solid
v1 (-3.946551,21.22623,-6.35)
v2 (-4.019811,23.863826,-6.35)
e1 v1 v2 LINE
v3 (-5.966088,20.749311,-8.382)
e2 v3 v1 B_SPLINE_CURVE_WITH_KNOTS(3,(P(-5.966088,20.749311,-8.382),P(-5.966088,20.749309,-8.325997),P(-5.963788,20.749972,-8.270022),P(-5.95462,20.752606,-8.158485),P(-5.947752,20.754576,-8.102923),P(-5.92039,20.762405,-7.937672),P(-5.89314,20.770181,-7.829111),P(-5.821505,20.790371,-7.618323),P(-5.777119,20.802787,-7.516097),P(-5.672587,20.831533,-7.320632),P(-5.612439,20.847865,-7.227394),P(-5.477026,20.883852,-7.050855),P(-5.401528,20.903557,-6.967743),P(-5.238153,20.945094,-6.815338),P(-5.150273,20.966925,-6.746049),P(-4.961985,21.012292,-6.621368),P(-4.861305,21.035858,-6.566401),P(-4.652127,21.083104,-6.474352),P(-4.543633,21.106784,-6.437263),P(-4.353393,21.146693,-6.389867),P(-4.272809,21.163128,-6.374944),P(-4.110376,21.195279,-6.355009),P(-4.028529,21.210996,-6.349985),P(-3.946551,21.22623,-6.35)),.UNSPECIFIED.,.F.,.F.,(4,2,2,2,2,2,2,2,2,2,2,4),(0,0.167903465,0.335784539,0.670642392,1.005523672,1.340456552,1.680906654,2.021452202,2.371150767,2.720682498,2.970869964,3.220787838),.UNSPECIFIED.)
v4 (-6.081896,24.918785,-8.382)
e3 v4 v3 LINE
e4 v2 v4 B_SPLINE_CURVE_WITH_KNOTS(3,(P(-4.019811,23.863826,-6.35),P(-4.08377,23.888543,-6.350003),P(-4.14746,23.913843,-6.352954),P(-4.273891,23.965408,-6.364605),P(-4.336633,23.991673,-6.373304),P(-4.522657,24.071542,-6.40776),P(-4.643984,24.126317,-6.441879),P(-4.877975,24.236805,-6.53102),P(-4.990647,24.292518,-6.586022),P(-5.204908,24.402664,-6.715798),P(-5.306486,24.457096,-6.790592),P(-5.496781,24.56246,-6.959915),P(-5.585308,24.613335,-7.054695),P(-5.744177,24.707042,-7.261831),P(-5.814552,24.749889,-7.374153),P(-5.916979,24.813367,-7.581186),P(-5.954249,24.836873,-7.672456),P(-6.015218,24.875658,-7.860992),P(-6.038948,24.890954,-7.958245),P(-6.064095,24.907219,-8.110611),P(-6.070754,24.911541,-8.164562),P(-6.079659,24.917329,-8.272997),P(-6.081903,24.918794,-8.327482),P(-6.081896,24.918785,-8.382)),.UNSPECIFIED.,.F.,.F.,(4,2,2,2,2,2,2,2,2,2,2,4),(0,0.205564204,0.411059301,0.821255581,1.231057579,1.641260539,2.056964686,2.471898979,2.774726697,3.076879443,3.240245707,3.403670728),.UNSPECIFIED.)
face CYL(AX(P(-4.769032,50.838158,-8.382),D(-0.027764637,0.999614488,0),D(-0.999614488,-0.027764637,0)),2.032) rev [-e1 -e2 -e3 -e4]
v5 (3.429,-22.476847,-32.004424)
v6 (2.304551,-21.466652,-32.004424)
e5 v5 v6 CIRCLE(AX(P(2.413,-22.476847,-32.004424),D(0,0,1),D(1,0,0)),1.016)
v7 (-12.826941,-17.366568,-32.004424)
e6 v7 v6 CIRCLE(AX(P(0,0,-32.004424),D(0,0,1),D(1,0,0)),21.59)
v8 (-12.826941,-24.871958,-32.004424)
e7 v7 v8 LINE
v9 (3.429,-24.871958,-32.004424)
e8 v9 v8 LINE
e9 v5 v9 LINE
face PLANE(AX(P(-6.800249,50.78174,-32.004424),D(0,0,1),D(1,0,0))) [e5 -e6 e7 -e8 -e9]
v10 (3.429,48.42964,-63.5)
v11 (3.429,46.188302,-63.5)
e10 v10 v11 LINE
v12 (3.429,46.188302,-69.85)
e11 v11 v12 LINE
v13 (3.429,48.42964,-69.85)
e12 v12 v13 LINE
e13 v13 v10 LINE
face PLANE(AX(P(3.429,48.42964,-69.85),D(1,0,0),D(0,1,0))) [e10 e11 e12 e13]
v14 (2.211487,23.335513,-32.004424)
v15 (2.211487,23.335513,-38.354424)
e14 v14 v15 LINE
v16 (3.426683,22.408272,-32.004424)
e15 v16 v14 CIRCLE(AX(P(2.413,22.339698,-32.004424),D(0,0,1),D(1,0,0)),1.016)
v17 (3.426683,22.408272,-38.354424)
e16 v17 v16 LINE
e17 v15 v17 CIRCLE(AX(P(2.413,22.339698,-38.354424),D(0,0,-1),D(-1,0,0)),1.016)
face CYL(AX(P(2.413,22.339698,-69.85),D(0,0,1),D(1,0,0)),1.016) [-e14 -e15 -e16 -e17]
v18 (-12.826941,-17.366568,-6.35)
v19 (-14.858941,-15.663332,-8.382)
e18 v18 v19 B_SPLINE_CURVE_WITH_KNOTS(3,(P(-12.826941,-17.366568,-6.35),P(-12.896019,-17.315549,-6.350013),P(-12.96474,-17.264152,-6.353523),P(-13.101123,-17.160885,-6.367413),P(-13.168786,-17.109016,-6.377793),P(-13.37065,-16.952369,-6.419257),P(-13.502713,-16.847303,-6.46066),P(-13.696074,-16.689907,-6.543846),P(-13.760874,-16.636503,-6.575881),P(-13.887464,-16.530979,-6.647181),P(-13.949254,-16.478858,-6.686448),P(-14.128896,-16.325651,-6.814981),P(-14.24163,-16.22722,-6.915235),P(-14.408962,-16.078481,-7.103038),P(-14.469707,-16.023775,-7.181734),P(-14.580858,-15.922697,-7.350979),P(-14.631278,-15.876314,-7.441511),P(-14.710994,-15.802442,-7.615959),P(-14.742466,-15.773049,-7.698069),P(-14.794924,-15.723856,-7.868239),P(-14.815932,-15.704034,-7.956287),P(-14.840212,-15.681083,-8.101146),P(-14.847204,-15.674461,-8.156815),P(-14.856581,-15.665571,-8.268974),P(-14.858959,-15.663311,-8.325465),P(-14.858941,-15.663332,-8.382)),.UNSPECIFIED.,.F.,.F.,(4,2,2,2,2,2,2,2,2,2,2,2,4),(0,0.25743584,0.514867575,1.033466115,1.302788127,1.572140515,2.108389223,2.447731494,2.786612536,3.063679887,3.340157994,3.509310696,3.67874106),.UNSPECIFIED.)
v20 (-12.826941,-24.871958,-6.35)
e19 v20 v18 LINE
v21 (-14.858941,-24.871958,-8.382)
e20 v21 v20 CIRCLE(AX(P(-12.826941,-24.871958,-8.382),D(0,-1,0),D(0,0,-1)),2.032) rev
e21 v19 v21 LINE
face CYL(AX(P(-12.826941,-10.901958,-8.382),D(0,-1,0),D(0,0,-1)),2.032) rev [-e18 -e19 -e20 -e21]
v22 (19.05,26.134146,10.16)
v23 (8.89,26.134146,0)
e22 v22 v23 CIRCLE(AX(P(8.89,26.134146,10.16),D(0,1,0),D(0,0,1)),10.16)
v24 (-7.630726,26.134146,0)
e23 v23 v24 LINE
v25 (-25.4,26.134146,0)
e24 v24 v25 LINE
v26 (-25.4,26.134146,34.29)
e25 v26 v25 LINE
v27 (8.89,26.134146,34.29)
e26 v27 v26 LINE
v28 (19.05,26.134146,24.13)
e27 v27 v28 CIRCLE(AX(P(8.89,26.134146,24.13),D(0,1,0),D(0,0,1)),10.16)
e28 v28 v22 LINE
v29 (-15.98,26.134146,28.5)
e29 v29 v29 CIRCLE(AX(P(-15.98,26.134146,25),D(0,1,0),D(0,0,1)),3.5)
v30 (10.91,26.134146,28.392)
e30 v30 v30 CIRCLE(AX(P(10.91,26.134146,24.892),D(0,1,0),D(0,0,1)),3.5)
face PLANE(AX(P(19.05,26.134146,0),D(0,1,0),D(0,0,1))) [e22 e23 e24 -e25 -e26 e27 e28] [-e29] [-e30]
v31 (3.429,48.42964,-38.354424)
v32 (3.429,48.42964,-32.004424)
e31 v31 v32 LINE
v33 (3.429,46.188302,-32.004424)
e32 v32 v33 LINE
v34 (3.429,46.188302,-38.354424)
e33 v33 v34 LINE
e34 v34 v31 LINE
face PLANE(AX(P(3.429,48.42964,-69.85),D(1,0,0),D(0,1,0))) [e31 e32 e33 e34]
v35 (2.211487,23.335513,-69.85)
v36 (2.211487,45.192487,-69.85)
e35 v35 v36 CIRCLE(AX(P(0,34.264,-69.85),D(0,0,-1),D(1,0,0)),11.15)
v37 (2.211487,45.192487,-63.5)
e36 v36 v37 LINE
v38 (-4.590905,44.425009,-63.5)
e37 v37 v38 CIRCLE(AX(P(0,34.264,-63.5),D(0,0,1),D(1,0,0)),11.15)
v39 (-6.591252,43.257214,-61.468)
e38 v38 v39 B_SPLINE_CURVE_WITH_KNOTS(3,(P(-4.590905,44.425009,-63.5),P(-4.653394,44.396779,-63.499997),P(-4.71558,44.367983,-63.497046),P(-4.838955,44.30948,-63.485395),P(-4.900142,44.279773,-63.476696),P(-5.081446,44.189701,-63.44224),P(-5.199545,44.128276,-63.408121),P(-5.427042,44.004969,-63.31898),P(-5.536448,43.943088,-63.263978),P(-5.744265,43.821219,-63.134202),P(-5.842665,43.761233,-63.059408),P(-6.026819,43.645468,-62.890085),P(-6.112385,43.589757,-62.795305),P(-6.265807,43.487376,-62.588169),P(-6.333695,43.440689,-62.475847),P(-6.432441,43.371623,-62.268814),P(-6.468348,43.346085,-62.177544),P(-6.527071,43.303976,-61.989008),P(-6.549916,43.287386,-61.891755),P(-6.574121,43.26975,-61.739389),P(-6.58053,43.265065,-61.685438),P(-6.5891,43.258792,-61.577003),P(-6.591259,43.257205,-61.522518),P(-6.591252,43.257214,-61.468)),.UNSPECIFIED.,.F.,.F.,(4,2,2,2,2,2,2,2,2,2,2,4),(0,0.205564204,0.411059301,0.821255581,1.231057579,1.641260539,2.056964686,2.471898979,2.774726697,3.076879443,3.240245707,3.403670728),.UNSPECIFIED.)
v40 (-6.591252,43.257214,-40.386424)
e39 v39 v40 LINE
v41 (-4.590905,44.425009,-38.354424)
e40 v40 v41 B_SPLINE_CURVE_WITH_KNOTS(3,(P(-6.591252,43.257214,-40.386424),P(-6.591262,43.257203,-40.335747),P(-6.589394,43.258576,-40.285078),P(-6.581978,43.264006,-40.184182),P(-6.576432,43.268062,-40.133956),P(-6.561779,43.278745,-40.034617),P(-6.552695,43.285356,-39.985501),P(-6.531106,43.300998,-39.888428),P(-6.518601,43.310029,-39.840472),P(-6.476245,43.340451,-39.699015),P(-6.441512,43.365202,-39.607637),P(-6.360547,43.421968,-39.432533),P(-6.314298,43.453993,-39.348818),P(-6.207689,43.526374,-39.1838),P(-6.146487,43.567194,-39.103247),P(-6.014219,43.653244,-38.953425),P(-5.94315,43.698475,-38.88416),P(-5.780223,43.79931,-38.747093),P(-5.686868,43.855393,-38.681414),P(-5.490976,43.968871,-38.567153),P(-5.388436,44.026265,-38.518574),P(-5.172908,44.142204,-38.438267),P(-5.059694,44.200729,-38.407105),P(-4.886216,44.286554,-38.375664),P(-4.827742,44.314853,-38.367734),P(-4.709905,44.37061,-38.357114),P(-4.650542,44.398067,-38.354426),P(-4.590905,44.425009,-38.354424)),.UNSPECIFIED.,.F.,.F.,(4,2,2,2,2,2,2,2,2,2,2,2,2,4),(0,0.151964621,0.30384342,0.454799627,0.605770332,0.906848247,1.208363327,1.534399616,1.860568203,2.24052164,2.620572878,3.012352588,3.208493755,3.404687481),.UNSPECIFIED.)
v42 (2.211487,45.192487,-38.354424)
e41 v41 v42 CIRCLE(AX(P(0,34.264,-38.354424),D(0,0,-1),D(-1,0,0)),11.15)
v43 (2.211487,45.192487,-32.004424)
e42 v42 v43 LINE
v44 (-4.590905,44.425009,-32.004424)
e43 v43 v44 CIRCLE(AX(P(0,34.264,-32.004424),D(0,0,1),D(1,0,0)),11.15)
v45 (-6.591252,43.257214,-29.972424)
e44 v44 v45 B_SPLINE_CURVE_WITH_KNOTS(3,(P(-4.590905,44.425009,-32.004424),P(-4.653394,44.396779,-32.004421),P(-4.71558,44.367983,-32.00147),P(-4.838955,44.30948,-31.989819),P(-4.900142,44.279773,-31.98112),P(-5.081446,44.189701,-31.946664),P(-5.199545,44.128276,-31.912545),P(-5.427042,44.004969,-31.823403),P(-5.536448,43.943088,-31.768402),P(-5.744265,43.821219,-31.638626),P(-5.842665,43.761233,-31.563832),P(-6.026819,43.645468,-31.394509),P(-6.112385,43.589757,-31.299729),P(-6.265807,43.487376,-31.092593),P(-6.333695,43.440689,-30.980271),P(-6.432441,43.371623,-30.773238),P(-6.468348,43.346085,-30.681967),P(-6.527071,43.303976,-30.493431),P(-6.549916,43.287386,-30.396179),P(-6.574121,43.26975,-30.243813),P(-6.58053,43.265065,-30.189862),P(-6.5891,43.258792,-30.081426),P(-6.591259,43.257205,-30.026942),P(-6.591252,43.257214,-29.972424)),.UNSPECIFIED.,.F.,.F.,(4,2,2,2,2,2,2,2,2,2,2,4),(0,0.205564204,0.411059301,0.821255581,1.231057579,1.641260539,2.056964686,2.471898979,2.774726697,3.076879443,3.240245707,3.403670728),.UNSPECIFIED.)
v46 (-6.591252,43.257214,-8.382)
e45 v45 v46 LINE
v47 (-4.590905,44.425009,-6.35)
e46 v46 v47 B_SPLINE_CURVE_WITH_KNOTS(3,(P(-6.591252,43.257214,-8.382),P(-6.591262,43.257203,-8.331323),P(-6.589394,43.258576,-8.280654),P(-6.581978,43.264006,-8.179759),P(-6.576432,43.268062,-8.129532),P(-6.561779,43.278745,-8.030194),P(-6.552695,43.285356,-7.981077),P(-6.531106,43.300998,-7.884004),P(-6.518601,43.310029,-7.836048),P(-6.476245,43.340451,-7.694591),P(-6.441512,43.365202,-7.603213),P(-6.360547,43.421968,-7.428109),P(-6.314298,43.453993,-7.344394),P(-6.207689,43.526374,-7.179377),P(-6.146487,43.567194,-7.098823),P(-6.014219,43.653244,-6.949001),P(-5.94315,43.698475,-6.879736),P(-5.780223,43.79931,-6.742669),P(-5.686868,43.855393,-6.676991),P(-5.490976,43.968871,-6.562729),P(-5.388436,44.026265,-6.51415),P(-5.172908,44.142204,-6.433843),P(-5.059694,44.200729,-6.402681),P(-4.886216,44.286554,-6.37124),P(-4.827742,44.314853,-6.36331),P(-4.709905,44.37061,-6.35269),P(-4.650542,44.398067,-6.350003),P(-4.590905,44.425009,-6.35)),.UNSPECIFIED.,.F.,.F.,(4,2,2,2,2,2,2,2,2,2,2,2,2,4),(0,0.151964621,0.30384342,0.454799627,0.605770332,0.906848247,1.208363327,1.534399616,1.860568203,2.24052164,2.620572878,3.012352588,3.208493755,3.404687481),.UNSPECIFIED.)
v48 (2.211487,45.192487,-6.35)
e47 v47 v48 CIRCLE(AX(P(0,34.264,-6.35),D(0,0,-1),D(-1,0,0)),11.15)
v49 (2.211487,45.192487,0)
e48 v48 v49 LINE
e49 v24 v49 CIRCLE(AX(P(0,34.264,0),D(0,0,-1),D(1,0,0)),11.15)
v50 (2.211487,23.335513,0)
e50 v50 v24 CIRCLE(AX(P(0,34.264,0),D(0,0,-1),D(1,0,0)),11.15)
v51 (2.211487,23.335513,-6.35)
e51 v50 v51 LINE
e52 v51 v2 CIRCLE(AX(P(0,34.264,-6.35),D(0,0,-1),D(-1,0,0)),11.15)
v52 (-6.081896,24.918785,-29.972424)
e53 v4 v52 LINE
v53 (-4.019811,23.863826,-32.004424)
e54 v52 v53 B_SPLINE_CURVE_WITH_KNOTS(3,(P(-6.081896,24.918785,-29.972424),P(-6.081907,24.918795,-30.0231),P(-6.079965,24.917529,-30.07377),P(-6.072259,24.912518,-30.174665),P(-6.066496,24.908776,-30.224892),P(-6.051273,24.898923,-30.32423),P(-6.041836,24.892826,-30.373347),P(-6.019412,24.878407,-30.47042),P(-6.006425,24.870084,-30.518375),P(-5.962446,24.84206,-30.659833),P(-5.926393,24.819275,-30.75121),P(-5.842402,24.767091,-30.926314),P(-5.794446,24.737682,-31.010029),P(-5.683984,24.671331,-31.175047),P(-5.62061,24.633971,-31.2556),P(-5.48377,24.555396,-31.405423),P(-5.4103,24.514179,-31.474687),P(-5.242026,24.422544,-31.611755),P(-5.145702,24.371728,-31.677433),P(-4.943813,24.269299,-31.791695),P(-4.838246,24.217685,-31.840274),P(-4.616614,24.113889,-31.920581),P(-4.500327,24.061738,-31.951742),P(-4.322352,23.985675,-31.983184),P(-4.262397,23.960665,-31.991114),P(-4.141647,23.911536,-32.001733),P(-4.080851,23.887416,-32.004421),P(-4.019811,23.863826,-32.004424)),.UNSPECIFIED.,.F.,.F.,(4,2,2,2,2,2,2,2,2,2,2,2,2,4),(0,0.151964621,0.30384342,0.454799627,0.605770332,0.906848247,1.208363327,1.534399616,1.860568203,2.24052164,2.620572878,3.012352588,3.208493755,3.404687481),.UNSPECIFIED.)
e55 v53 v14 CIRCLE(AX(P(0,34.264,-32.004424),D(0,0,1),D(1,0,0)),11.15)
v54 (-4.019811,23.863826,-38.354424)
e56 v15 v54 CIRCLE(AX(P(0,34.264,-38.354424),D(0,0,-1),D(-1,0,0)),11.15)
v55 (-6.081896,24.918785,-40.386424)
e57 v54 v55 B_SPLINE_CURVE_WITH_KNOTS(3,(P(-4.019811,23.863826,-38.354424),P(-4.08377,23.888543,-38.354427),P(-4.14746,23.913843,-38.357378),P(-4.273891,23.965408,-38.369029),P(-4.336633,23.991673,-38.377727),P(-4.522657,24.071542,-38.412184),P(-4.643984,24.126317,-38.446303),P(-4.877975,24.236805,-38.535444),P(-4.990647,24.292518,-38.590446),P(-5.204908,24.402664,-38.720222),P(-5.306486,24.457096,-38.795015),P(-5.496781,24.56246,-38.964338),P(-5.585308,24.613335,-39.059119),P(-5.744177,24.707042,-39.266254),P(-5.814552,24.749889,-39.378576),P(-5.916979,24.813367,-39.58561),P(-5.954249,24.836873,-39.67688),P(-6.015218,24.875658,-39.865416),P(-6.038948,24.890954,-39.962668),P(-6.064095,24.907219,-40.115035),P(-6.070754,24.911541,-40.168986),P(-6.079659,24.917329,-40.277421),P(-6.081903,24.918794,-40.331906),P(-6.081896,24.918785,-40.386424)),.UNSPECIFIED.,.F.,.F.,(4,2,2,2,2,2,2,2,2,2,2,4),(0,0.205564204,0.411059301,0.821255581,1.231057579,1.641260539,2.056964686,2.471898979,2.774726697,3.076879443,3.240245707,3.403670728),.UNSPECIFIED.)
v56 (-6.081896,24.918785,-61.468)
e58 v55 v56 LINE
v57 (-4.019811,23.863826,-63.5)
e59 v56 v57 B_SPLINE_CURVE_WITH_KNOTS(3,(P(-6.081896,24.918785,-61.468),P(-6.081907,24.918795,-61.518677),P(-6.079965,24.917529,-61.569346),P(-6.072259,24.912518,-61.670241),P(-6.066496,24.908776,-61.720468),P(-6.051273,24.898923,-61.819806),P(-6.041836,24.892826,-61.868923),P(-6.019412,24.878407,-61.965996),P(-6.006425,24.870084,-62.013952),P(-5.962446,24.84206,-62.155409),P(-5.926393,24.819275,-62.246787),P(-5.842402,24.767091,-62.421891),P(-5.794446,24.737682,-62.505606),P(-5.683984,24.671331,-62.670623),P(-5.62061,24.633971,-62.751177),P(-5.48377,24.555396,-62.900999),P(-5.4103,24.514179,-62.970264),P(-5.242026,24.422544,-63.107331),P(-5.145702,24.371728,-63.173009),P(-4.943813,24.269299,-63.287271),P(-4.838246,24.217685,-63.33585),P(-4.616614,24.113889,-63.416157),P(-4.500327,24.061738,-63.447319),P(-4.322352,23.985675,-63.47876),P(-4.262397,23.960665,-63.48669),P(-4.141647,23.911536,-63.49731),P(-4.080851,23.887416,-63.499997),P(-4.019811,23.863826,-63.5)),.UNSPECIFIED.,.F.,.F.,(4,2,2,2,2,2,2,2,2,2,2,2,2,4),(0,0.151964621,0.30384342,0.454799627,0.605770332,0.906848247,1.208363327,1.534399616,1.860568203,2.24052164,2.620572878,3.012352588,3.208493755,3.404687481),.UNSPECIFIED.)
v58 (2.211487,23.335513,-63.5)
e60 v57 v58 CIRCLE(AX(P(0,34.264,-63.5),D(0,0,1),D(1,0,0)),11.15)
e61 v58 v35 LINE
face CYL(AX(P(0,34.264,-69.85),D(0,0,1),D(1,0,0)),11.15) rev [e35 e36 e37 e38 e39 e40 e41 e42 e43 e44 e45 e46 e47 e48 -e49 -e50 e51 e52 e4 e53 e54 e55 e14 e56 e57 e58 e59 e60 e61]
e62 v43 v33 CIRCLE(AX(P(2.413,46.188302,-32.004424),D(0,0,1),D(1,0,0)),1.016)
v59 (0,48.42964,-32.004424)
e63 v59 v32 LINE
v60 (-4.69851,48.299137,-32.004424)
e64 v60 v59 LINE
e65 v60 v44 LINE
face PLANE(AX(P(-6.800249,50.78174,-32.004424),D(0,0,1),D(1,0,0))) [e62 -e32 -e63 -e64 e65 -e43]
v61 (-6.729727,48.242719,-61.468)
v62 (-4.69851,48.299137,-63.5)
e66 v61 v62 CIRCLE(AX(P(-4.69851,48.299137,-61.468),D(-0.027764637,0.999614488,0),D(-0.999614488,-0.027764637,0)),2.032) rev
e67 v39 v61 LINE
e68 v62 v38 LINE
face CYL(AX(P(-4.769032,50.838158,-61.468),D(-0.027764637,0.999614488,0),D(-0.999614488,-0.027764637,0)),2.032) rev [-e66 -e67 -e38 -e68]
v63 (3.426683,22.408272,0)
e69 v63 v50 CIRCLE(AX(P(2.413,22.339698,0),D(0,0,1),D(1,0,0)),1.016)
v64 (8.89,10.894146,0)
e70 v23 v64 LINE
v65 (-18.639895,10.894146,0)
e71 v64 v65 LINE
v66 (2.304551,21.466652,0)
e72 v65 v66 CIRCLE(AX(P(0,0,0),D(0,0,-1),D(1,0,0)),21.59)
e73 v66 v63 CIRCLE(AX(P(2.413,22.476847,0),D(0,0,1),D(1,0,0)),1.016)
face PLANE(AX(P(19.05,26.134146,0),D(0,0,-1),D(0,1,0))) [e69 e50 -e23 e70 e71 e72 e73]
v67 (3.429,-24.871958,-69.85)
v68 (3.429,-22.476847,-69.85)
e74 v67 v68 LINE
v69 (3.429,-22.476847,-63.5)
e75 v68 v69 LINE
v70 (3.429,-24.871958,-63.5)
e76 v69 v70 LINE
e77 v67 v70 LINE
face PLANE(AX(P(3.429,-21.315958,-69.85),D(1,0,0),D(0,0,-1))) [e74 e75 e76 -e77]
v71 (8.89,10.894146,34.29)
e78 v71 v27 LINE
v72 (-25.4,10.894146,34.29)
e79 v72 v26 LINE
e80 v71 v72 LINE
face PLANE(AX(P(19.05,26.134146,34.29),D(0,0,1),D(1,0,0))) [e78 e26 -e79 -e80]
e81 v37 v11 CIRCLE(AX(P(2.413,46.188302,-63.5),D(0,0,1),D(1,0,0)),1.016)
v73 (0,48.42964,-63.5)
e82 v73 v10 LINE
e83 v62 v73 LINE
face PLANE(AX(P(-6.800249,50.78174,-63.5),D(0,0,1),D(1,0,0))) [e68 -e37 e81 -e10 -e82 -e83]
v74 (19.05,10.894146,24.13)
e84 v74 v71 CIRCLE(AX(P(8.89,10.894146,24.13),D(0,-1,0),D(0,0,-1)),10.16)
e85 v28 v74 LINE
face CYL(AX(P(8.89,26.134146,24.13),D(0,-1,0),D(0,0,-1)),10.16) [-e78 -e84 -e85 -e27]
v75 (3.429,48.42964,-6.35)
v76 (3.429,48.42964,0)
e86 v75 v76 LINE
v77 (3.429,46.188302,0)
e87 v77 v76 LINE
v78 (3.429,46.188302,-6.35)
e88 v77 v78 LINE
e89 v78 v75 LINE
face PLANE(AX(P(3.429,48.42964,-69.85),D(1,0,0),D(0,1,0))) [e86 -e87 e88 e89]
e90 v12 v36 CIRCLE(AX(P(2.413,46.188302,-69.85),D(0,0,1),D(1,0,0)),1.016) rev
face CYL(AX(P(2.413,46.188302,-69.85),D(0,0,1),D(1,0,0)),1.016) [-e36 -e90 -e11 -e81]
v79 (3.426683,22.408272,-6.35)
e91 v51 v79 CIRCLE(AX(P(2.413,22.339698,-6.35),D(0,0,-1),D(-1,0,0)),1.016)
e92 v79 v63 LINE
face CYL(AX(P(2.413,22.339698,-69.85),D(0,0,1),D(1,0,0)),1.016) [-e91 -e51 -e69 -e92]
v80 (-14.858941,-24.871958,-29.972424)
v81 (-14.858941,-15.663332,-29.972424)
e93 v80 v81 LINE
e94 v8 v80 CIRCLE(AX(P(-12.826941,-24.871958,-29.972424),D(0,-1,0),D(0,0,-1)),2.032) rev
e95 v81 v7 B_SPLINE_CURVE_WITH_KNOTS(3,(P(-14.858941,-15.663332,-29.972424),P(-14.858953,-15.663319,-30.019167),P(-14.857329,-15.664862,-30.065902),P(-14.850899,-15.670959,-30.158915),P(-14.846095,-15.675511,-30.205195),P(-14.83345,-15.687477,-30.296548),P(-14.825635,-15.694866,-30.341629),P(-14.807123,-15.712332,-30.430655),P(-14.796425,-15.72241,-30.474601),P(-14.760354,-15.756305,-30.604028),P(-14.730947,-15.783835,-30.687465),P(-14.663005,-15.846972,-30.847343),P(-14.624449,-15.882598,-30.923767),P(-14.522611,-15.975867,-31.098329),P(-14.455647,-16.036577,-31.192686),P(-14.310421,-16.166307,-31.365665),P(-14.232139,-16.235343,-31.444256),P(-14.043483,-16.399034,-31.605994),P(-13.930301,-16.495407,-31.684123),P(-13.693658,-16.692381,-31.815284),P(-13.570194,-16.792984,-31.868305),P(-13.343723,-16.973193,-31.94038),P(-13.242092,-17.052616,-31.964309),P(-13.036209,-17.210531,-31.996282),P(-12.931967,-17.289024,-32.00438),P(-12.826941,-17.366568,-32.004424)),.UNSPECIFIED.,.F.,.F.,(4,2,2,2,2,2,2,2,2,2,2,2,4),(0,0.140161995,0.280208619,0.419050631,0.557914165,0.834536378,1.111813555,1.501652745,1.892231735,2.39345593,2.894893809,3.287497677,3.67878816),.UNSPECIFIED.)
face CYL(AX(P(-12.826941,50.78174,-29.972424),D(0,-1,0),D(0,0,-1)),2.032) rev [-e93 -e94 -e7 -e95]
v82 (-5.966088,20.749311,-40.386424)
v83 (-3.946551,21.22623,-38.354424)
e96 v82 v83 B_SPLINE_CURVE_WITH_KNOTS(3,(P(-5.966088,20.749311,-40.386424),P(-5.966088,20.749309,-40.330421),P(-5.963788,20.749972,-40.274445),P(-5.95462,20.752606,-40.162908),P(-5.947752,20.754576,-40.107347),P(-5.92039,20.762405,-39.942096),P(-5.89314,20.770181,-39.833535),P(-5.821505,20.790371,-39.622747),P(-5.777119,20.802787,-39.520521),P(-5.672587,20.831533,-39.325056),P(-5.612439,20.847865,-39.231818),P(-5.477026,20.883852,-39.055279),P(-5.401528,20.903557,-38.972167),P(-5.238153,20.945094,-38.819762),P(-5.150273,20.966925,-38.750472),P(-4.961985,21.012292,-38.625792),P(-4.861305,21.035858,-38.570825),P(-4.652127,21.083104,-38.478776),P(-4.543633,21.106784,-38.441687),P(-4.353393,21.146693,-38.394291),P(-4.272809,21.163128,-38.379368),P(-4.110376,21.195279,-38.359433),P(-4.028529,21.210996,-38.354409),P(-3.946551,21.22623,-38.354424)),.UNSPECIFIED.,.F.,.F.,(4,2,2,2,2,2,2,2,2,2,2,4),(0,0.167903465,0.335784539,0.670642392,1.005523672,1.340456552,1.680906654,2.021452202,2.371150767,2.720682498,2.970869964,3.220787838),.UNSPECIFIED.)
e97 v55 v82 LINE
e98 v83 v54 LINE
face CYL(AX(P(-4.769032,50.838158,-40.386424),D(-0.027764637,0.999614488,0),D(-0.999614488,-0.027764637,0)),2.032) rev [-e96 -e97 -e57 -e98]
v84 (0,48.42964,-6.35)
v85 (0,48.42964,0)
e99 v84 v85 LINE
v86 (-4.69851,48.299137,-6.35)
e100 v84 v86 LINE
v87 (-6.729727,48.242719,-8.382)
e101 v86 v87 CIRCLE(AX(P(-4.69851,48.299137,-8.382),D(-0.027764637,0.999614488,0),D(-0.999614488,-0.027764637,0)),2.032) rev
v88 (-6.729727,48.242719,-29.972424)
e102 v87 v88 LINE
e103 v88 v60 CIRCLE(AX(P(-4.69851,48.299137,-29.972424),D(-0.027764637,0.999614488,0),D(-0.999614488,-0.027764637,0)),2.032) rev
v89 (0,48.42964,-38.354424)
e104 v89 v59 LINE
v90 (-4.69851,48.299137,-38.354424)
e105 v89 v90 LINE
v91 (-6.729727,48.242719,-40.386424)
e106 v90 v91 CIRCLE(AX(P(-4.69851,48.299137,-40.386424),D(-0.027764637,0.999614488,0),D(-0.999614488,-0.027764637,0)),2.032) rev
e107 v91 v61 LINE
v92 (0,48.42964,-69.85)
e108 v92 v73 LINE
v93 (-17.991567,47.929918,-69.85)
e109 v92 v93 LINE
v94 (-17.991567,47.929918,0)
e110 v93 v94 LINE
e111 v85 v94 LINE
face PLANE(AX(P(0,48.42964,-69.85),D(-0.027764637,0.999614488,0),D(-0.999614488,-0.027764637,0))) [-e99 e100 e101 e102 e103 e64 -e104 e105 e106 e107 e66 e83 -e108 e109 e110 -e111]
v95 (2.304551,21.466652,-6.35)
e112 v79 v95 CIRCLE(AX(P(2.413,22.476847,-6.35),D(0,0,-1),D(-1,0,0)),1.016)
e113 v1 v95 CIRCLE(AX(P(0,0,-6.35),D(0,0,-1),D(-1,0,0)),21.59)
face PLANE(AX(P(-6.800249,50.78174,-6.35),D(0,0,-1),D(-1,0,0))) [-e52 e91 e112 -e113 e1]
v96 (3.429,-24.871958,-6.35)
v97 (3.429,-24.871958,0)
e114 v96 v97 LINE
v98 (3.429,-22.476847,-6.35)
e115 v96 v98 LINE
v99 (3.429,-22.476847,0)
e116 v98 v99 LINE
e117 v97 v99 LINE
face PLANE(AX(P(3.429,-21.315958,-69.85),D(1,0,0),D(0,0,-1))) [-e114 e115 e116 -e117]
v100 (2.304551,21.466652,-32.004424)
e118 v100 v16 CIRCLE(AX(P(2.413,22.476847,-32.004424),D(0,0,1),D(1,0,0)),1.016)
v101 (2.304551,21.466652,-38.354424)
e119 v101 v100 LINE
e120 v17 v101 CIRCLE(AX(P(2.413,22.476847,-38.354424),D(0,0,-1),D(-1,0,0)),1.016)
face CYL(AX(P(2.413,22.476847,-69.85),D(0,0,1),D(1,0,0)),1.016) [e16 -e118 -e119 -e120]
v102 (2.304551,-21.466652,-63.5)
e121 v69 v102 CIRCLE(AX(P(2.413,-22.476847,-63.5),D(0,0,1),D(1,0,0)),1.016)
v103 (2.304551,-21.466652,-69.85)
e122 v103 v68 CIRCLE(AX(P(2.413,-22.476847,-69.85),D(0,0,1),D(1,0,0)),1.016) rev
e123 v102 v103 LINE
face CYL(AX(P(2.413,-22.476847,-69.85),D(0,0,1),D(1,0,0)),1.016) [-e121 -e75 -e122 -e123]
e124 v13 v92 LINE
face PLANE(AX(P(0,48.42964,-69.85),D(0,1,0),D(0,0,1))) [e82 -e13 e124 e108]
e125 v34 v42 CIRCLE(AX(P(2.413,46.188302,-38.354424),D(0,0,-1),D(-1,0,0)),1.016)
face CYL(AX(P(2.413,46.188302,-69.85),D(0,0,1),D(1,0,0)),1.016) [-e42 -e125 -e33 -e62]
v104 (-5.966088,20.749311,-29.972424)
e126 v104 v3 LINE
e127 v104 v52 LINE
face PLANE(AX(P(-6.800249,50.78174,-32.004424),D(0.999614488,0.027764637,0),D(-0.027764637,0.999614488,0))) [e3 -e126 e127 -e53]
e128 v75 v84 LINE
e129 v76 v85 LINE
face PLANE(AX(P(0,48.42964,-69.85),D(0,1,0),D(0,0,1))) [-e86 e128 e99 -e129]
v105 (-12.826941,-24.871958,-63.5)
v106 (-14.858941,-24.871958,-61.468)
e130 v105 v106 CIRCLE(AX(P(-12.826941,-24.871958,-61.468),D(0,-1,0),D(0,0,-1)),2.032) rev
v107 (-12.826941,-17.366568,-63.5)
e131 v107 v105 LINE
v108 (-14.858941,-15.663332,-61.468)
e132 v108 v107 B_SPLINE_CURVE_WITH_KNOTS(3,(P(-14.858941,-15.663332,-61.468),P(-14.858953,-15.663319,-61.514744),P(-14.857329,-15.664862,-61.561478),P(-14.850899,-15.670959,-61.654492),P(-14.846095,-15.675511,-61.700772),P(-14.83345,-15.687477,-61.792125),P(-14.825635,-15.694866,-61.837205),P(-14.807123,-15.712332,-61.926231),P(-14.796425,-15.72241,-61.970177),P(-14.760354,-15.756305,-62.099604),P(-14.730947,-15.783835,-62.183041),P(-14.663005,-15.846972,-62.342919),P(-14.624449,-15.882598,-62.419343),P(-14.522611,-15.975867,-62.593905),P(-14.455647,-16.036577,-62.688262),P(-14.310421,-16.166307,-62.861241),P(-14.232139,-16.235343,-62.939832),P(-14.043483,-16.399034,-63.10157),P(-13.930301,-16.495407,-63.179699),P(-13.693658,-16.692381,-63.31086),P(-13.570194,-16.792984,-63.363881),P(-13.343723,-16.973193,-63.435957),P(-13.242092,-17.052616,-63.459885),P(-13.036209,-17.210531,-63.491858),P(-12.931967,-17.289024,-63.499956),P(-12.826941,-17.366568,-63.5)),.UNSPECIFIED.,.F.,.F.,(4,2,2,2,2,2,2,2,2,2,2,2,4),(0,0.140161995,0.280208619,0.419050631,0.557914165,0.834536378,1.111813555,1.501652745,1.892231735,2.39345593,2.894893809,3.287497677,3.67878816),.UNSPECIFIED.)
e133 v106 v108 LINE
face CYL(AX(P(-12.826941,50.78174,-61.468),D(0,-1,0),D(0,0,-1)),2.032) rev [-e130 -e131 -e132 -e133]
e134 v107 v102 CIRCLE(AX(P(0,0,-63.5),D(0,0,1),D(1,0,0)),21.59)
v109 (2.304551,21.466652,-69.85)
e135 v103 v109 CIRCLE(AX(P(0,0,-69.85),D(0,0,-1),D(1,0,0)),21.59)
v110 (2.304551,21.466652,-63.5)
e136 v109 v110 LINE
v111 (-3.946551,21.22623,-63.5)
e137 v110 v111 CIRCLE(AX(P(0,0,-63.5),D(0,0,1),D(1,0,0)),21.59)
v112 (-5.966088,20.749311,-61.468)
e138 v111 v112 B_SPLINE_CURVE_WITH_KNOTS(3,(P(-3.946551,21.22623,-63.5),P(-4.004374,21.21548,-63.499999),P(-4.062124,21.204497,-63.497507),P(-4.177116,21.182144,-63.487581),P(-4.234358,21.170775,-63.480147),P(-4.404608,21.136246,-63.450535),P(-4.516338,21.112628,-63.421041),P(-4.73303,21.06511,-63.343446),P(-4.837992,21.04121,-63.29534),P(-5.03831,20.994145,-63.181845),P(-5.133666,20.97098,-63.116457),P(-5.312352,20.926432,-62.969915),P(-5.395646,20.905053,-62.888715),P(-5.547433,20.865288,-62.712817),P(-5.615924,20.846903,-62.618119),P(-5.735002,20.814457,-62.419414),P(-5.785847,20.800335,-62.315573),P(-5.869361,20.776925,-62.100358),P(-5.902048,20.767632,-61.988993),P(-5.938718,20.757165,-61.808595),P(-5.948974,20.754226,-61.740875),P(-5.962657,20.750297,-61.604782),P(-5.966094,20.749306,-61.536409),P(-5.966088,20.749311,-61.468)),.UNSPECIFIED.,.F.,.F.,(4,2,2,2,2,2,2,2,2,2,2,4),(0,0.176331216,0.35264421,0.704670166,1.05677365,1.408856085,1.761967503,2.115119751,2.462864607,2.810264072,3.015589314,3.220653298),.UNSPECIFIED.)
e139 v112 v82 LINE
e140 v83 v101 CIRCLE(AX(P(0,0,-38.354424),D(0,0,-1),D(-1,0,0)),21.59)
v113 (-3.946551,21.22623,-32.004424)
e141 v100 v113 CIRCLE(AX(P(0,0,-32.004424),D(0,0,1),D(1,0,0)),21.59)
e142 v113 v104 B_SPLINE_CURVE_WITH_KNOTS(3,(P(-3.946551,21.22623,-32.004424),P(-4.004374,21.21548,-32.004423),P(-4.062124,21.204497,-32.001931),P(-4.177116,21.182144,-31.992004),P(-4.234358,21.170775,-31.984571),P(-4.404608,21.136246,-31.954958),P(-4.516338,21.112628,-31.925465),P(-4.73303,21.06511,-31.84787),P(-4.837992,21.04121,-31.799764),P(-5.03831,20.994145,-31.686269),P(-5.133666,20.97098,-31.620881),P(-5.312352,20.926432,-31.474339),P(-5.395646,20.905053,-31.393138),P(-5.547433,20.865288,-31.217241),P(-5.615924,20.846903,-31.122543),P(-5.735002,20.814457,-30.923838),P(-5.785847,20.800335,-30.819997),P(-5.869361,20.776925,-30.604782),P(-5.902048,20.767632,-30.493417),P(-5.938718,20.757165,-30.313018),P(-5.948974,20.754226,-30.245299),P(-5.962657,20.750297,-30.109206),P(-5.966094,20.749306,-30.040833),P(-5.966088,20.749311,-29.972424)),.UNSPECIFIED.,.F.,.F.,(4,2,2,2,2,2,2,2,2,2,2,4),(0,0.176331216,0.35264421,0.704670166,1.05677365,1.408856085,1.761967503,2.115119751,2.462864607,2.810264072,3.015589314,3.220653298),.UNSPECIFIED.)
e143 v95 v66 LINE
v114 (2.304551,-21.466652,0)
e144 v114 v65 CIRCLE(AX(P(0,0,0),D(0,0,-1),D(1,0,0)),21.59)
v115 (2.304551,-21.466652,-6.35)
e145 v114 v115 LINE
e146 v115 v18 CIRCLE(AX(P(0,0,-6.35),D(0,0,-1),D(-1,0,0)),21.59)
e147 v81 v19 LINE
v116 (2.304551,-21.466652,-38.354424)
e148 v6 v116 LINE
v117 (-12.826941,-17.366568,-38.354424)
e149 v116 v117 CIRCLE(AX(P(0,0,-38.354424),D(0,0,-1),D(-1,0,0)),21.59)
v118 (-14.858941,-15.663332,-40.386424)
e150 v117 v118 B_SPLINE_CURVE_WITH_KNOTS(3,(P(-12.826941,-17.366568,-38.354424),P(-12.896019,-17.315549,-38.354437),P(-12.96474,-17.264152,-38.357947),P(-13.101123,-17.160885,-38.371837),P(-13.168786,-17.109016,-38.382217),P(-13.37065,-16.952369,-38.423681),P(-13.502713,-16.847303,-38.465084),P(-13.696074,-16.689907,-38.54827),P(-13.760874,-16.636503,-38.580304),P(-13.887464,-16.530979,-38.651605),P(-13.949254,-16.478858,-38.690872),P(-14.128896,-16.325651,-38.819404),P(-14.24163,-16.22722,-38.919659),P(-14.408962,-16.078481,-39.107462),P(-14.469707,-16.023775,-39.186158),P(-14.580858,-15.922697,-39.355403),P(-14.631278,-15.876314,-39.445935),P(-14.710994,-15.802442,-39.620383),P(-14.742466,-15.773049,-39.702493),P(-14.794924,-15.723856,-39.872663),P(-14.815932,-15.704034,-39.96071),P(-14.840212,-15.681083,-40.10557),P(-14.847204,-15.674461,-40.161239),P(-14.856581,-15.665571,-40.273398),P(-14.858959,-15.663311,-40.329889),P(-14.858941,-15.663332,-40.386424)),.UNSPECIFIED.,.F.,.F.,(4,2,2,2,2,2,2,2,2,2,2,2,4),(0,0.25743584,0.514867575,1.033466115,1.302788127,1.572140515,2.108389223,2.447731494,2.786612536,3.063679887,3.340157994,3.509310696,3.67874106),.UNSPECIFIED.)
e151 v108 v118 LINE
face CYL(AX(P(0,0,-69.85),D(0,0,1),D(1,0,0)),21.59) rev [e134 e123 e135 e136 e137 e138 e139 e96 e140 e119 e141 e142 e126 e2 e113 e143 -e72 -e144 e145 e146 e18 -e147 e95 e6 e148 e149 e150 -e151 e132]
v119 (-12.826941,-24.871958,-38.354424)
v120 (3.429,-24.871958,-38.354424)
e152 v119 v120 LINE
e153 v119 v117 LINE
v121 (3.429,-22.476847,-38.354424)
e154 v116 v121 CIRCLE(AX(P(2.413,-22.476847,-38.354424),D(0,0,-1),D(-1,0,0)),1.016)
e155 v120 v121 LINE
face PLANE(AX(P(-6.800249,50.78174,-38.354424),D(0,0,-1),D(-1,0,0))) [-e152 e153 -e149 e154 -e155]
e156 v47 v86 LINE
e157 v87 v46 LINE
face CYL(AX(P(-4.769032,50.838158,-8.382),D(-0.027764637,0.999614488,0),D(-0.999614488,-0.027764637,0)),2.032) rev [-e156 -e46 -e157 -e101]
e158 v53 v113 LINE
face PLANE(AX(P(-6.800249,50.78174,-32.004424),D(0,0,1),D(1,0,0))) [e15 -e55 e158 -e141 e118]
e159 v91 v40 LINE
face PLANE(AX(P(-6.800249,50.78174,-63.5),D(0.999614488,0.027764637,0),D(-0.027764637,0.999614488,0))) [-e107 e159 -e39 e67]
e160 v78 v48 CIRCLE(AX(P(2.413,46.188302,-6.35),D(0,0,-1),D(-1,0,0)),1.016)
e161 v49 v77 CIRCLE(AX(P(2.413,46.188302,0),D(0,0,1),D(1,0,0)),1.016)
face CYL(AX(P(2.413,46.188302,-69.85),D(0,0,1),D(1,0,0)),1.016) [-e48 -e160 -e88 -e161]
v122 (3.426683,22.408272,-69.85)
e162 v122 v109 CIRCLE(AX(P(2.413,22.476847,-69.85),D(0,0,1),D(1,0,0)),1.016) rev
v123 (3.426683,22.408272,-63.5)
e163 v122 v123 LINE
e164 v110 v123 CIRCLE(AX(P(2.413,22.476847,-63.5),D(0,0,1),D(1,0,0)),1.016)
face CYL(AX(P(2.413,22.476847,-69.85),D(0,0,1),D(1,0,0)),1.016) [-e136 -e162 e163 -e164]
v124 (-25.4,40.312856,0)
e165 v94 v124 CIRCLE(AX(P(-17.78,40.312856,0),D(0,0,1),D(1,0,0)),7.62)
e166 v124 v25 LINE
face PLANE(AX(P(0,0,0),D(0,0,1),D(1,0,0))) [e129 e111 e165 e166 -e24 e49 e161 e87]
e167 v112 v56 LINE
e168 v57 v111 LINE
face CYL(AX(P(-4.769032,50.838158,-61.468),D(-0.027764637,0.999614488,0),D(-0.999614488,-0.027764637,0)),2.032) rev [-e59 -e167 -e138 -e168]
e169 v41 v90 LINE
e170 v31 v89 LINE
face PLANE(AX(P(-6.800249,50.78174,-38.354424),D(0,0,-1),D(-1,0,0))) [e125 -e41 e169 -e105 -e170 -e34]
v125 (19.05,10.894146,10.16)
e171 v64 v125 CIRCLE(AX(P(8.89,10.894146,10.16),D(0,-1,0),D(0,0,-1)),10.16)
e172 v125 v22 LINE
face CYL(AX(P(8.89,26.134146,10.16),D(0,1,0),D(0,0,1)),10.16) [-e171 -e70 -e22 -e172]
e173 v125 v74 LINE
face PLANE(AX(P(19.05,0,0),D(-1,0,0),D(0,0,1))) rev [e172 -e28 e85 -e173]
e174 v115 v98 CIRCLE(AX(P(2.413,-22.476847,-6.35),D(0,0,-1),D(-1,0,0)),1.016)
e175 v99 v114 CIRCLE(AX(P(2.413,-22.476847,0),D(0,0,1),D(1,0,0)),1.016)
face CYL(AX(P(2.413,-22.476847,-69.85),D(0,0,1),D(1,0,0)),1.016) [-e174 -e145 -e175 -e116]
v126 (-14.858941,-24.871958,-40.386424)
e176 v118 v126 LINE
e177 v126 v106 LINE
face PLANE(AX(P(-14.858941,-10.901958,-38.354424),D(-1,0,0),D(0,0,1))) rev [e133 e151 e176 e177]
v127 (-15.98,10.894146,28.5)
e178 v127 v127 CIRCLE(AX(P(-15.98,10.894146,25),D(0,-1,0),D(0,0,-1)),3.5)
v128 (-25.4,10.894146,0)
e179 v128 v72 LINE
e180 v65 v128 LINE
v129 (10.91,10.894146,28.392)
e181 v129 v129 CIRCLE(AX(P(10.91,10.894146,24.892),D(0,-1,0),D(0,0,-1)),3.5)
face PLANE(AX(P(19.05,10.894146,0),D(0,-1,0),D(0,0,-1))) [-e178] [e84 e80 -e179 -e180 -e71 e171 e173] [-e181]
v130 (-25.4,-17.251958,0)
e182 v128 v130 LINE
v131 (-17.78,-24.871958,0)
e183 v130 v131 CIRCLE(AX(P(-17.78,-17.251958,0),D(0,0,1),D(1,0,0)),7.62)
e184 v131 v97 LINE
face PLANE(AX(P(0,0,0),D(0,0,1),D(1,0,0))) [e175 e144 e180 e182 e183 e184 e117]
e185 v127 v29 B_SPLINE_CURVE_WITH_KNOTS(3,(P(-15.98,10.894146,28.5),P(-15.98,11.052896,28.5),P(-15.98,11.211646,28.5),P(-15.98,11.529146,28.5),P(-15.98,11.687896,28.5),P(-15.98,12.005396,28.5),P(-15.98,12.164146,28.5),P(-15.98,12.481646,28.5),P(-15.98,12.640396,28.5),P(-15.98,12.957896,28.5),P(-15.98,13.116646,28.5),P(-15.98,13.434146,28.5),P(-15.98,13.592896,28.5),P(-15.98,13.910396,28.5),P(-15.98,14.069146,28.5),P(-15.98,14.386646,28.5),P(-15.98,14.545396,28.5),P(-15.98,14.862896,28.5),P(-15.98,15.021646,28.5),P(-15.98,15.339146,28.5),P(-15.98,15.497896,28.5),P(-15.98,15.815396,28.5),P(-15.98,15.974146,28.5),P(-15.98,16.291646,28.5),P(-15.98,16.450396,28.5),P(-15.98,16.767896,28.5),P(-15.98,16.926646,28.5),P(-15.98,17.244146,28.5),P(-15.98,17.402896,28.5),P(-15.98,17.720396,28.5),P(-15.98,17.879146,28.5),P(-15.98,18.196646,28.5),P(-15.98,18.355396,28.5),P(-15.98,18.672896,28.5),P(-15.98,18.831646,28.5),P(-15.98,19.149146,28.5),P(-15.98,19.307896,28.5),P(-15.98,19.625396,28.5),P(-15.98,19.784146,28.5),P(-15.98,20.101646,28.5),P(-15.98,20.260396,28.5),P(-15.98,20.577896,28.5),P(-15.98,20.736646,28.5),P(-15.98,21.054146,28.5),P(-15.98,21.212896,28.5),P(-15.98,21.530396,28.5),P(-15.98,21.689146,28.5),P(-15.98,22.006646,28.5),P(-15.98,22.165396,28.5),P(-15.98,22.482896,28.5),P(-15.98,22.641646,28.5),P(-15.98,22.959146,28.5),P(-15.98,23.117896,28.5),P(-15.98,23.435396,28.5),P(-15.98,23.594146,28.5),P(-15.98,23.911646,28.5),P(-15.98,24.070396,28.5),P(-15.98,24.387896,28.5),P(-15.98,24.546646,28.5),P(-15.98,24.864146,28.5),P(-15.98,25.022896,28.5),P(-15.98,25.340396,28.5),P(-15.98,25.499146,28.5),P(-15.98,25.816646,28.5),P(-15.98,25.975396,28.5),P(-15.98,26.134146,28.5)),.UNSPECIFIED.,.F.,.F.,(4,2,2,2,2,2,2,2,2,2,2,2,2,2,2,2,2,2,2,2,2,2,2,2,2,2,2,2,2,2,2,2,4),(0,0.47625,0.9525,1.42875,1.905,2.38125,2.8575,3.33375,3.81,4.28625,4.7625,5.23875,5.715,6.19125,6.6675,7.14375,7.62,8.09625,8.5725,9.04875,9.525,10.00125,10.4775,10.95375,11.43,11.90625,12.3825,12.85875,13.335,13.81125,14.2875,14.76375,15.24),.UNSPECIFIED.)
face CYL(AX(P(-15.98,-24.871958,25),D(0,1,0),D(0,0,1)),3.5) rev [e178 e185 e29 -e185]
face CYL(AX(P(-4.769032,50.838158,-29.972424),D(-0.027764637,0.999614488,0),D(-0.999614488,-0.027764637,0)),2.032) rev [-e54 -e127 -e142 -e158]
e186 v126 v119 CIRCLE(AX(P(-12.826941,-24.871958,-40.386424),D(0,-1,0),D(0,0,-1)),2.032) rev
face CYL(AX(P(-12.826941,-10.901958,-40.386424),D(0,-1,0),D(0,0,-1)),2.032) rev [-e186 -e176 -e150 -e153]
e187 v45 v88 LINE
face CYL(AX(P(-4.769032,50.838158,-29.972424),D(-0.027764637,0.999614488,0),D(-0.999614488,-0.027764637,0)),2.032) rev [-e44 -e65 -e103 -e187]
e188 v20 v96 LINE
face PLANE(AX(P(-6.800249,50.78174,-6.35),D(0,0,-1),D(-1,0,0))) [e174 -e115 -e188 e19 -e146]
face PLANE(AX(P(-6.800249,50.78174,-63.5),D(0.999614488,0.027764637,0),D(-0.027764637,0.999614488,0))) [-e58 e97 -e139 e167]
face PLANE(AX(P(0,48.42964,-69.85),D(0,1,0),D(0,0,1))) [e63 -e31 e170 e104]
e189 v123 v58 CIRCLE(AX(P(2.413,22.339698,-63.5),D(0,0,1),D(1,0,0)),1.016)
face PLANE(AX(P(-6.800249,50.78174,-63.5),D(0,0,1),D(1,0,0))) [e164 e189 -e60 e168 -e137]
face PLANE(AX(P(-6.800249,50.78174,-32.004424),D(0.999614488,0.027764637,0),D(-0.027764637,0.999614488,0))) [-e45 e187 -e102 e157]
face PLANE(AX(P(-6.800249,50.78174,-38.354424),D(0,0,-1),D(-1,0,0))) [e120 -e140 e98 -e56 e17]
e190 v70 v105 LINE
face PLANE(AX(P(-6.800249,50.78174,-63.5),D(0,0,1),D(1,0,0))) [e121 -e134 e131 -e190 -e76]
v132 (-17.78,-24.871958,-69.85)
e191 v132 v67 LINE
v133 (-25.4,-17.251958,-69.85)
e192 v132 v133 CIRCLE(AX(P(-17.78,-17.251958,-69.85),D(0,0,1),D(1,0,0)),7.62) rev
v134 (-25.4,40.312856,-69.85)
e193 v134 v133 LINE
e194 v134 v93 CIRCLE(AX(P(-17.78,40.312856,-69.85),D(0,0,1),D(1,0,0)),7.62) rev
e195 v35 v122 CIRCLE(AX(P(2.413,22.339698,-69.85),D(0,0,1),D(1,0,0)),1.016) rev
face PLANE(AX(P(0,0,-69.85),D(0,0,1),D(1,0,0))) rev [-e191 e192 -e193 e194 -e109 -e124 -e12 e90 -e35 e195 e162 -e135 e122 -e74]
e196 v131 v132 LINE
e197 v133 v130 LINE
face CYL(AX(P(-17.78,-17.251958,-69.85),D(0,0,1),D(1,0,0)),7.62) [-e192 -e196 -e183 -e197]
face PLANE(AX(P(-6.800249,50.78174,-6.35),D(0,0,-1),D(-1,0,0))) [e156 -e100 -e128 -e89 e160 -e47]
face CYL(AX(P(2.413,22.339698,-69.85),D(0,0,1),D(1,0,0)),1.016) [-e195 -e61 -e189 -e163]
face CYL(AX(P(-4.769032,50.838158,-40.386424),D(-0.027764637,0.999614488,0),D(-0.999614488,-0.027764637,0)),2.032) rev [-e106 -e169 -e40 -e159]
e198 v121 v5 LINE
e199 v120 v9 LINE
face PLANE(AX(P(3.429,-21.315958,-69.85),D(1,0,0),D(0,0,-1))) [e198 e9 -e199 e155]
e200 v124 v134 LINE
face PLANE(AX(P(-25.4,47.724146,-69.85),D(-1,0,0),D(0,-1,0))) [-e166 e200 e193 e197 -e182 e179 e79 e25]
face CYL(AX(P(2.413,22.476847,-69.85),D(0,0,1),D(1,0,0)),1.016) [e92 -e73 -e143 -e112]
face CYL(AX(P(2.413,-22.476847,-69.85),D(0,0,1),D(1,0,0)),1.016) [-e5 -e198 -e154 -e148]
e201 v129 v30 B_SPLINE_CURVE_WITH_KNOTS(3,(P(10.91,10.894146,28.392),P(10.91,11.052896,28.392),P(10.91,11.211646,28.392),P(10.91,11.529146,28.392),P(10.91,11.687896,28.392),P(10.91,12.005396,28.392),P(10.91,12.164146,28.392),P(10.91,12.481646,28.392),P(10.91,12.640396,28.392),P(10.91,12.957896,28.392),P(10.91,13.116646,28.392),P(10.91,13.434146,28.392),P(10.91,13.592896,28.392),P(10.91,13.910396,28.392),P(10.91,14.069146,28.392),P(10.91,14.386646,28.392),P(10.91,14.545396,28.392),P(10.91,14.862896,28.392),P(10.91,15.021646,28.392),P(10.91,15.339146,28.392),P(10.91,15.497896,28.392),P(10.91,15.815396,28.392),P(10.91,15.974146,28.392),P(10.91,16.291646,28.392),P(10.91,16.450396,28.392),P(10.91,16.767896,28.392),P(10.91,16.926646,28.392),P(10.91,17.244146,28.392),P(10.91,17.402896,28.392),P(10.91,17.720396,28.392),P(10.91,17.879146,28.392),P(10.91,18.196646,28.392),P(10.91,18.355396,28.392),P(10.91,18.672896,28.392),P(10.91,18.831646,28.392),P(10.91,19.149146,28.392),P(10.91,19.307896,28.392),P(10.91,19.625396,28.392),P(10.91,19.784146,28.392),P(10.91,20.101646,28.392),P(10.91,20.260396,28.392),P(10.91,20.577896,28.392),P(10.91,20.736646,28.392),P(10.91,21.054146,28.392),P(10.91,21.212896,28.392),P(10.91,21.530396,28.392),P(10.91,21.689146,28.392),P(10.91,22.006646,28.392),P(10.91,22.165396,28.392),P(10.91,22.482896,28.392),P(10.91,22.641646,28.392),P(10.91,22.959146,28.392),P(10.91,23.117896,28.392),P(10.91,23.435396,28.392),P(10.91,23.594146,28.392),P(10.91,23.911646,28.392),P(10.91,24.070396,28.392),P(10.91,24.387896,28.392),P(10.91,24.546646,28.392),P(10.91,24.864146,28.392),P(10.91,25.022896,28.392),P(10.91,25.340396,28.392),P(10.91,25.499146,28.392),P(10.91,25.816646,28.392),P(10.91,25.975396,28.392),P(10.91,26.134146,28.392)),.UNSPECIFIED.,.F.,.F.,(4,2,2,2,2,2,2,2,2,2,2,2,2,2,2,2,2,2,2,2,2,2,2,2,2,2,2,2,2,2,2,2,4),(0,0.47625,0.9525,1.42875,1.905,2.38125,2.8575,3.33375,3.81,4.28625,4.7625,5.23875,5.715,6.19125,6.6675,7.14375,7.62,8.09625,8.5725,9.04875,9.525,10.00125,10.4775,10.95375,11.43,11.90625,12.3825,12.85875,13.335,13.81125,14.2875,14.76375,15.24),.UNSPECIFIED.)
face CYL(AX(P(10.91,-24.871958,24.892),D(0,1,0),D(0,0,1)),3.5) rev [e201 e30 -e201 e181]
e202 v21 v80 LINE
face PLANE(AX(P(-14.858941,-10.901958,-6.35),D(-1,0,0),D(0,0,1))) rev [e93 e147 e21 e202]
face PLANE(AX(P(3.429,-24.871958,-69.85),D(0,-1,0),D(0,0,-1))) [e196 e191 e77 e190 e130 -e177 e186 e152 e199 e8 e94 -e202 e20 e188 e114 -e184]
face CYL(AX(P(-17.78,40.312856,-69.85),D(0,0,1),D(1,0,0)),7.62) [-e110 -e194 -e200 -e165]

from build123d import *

# Parameters (mm, degrees)
BOSS_EXTRUDE1_DEPTH     = 69.85
CUT_EXTRUDE1_DEPTH      = 2.54
CUT_EXTRUDE1_DEPTH_BACK = 105.044993435
SKETCH2_W               = 16.044844987
SKETCH2_H               = 25.145576203
SKETCH2_H_2             = 25.654423797
CUT_EXTRUDE2_DEPTH      = 13.97
FILLET1_R               = 1.016
FILLET2_R               = 2.032
SKETCH4_W               = 34.29
SKETCH4_H               = 15.24
BOSS_EXTRUDE2_DEPTH     = 44.45
FILLET3_R               = 10.16
SKETCH5_R               = 3.5
CUT_EXTRUDE3_DEPTH      = 91.143248047
FILLET4_R               = 7.62


with BuildPart() as part:
    # Sketch1 → Boss-Extrude1 (new body)
    with BuildSketch(Plane.XY):
        with BuildLine():
            Line((3.429, -21.315957849), (3.429, -24.871957849))
            Line((3.429, -24.871957849), (0, -24.871957849))
            Line((0, -24.871957849), (-25.4, -24.871957849))
            Line((-25.4, -24.871957849), (-25.4, 47.724146141))
            Line((-25.4, 47.724146141), (0, 48.429639909))
            Line((0, 48.429639909), (3.429, 48.429639909))
            Line((3.429, 48.429639909), (3.429, 44.873639909))
            ThreePointArc((3.429, 44.873639909), (-11.15, 34.264), (3.429, 23.654360091))
            Line((3.429, 23.654360091), (3.429, 21.315957849))
            ThreePointArc((3.429, 21.315957849), (-21.59, 0), (3.429, -21.315957849))
        make_face()
    extrude(amount=-BOSS_EXTRUDE1_DEPTH)

    # Sketch2 → Cut-Extrude1 (cut, two sides: drawn at the far end of the back side and taken through both)
    with BuildSketch(Plane(origin=(-1.344113023, 48.392306706, 0), x_dir=(0.9996144881434057, 0.027764637469221053, 0), z_dir=(-0.027764637469221053, 0.9996144881434057, 0)).offset(-CUT_EXTRUDE1_DEPTH_BACK)):
        with Locations((2.634731969, 50.927211899)):
            Rectangle(SKETCH2_W, SKETCH2_H)
        with Locations((2.634731969, 19.177211899)):
            Rectangle(SKETCH2_W, SKETCH2_H_2)
    extrude(amount=CUT_EXTRUDE1_DEPTH + CUT_EXTRUDE1_DEPTH_BACK, mode=Mode.SUBTRACT)

    # Sketch3 → Cut-Extrude2 (cut)
    with BuildSketch(Plane.XZ.offset(24.871957849)):
        Polygon((-4.69894113, -6.35), (-14.85894113, -6.35), (-14.85894113, -32.004423797), (-7.683449997, -32.004423797), (-4.37926474, -32.004423797), (-4.37926474, -6.35), align=None)
        Polygon((-4.69894113, -38.354423797), (-14.85894113, -38.354423797), (-14.85894113, -63.5), (-7.683449997, -63.5), (-2.422701427, -63.5), (-2.422701427, -38.354423797), align=None)
    extrude(amount=-CUT_EXTRUDE2_DEPTH, mode=Mode.SUBTRACT)

    # Fillet1
    # the kernel refuses this fillet: 1.016 mm, written as the material it takes off along each edge
    with BuildSketch(Plane(origin=(3.429, -21.315957849, -60.597776235), x_dir=(-0.9911390490997786, -0.13282840565777682, 0), z_dir=(0, 0, -1)), Plane(origin=(3.429, -21.315957849, -29.102200032), x_dir=(-0.9911390490997786, -0.13282840565777682, 0), z_dir=(0, 0, -1))) as fillet1_piece_1:
        with BuildLine():
            CenterArc((1.161196376, -1.015649261), FILLET1_R, 91.505550469, 96.127515329)
            Line((0.154199102, -1.150602921), (0, 0))
            ThreePointArc((0, 0), (0.567251103, -0.007453204), (1.134502207, 0))
        make_face()
    extrude(amount=12.15444753, mode=Mode.SUBTRACT)
    with BuildSketch(Plane(origin=(3.429, 44.873639909, -60.213343849), x_dir=(-0.967377188342964, 0.25334043394938266, 0), z_dir=(0, 0, -1)), Plane(origin=(3.429, 44.873639909, -28.717767646), x_dir=(-0.967377188342964, 0.25334043394938266, 0), z_dir=(0, 0, -1)), Plane(origin=(3.429, 44.873639909, 3.286656151), x_dir=(-0.967377188342964, 0.25334043394938266, 0), z_dir=(0, 0, -1))) as fillet1_piece_2:
        with BuildLine():
            CenterArc((1.315912382, 1.014380594), FILLET1_R, 165.324729703, 101.43988218)
            Line((0.333057158, 1.271774475), (0, 0))
            ThreePointArc((0, 0), (0.6292856, 0.017772027), (1.2585712, 0))
        make_face()
    extrude(amount=12.923312302, mode=Mode.SUBTRACT)
    with BuildSketch(Plane(origin=(3.429, 23.654360091, -60.213343849), x_dir=(-0.9673771883429638, -0.2533404339493828, 0), z_dir=(0, 0, -1)), Plane(origin=(3.429, 23.654360091, -28.717767646), x_dir=(-0.9673771883429638, -0.2533404339493828, 0), z_dir=(0, 0, -1)), Plane(origin=(3.429, 23.654360091, 3.286656151), x_dir=(-0.9673771883429638, -0.2533404339493828, 0), z_dir=(0, 0, -1))) as fillet1_piece_3:
        with BuildLine():
            CenterArc((1.315912382, -1.014380594), FILLET1_R, 93.235388117, 101.43988218)
            Line((0.333057158, -1.271774475), (0, 0))
            ThreePointArc((0, 0), (0.6292856, -0.017772027), (1.2585712, 0))
        make_face()
    extrude(amount=12.923312302, mode=Mode.SUBTRACT)
    with BuildSketch(Plane(origin=(3.429, 21.315957849, -60.597776235), x_dir=(-0.9911390490997777, 0.13282840565778328, 0), z_dir=(0, 0, -1)), Plane(origin=(3.429, 21.315957849, -29.102200032), x_dir=(-0.9911390490997777, 0.13282840565778328, 0), z_dir=(0, 0, -1)), Plane(origin=(3.429, 21.315957849, 2.902223765), x_dir=(-0.9911390490997777, 0.13282840565778328, 0), z_dir=(0, 0, -1))) as fillet1_piece_4:
        with BuildLine():
            CenterArc((1.161196376, 1.015649261), FILLET1_R, 172.366934203, 96.127515328)
            Line((0.154199102, 1.150602921), (0, 0))
            ThreePointArc((0, 0), (0.567251103, 0.007453204), (1.134502207, 0))
        make_face()
    extrude(amount=12.15444753, mode=Mode.SUBTRACT)
    with BuildSketch(Plane(origin=(3.429, -21.315957849, 2.902223765), x_dir=(0, -1, 0), z_dir=(0, 0, -1))) as fillet1_piece_5:
        with BuildLine():
            CenterArc((1.160889506, 1.016), FILLET1_R, 173.872484672, 96.127515328)
            ThreePointArc((0.150694119, 1.124449438), (0.082734222, 0.561234722), (0, 0))
            Line((0, 0), (1.160889506, 0))
        make_face()
    extrude(amount=12.15444753, mode=Mode.SUBTRACT)

    # Fillet2
    fillet2_edges = [part.edges().sort_by_distance(p)[0] for p in [
        (-14.85894113, -20.267644911, -6.35),
        (-14.85894113, -20.267644911, -32.004423797),
        (-14.85894113, -20.267644911, -38.354423797),
        (-14.85894113, -20.267644911, -63.5),
        (-6.023991911, 22.834048029, -63.5),
        (-6.660489458, 45.749966547, -63.5),
        (-6.660489458, 45.749966547, -38.354423797),
        (-6.023991911, 22.834048029, -38.354423797),
        (-6.023991911, 22.834048029, -32.004423797),
        (-6.660489458, 45.749966547, -32.004423797),
        (-6.660489458, 45.749966547, -6.35),
        (-6.023991911, 22.834048029, -6.35),
    ]]
    fillet(fillet2_edges, radius=FILLET2_R)

    # Sketch4 → Boss-Extrude2 (add)
    with BuildSketch(Plane.ZY.offset(25.4)):
        with Locations((17.145, 18.514146141)):
            Rectangle(SKETCH4_W, SKETCH4_H)
    extrude(amount=-BOSS_EXTRUDE2_DEPTH)

    # Fillet3
    fillet3_edges = [part.edges().sort_by_distance(p)[0] for p in [
        (19.05, 18.514146141, 0),
        (19.05, 18.514146141, 34.29),
    ]]
    fillet(fillet3_edges, radius=FILLET3_R)

    # Sketch5 → Cut-Extrude3 (cut, through all)
    with BuildSketch(Plane(origin=(0, 26.134146141, 0), x_dir=(1, 0, 0), z_dir=(0, 1, 0))):
        with Locations(Location((10.91, -24.892, 0), (0, 0, 270))):
            Circle(SKETCH5_R)
        with Locations(Location((-15.98, -25, 0), (0, 0, 270))):
            Circle(SKETCH5_R)
    extrude(amount=-CUT_EXTRUDE3_DEPTH, mode=Mode.SUBTRACT)

    # Fillet4
    fillet4_edges = [part.edges().sort_by_distance(p)[0] for p in [
        (-25.4, -24.871957849, -34.925),
        (-25.4, 47.724146141, -34.925),
    ]]
    fillet(fillet4_edges, radius=FILLET4_R)


solid = part.part
